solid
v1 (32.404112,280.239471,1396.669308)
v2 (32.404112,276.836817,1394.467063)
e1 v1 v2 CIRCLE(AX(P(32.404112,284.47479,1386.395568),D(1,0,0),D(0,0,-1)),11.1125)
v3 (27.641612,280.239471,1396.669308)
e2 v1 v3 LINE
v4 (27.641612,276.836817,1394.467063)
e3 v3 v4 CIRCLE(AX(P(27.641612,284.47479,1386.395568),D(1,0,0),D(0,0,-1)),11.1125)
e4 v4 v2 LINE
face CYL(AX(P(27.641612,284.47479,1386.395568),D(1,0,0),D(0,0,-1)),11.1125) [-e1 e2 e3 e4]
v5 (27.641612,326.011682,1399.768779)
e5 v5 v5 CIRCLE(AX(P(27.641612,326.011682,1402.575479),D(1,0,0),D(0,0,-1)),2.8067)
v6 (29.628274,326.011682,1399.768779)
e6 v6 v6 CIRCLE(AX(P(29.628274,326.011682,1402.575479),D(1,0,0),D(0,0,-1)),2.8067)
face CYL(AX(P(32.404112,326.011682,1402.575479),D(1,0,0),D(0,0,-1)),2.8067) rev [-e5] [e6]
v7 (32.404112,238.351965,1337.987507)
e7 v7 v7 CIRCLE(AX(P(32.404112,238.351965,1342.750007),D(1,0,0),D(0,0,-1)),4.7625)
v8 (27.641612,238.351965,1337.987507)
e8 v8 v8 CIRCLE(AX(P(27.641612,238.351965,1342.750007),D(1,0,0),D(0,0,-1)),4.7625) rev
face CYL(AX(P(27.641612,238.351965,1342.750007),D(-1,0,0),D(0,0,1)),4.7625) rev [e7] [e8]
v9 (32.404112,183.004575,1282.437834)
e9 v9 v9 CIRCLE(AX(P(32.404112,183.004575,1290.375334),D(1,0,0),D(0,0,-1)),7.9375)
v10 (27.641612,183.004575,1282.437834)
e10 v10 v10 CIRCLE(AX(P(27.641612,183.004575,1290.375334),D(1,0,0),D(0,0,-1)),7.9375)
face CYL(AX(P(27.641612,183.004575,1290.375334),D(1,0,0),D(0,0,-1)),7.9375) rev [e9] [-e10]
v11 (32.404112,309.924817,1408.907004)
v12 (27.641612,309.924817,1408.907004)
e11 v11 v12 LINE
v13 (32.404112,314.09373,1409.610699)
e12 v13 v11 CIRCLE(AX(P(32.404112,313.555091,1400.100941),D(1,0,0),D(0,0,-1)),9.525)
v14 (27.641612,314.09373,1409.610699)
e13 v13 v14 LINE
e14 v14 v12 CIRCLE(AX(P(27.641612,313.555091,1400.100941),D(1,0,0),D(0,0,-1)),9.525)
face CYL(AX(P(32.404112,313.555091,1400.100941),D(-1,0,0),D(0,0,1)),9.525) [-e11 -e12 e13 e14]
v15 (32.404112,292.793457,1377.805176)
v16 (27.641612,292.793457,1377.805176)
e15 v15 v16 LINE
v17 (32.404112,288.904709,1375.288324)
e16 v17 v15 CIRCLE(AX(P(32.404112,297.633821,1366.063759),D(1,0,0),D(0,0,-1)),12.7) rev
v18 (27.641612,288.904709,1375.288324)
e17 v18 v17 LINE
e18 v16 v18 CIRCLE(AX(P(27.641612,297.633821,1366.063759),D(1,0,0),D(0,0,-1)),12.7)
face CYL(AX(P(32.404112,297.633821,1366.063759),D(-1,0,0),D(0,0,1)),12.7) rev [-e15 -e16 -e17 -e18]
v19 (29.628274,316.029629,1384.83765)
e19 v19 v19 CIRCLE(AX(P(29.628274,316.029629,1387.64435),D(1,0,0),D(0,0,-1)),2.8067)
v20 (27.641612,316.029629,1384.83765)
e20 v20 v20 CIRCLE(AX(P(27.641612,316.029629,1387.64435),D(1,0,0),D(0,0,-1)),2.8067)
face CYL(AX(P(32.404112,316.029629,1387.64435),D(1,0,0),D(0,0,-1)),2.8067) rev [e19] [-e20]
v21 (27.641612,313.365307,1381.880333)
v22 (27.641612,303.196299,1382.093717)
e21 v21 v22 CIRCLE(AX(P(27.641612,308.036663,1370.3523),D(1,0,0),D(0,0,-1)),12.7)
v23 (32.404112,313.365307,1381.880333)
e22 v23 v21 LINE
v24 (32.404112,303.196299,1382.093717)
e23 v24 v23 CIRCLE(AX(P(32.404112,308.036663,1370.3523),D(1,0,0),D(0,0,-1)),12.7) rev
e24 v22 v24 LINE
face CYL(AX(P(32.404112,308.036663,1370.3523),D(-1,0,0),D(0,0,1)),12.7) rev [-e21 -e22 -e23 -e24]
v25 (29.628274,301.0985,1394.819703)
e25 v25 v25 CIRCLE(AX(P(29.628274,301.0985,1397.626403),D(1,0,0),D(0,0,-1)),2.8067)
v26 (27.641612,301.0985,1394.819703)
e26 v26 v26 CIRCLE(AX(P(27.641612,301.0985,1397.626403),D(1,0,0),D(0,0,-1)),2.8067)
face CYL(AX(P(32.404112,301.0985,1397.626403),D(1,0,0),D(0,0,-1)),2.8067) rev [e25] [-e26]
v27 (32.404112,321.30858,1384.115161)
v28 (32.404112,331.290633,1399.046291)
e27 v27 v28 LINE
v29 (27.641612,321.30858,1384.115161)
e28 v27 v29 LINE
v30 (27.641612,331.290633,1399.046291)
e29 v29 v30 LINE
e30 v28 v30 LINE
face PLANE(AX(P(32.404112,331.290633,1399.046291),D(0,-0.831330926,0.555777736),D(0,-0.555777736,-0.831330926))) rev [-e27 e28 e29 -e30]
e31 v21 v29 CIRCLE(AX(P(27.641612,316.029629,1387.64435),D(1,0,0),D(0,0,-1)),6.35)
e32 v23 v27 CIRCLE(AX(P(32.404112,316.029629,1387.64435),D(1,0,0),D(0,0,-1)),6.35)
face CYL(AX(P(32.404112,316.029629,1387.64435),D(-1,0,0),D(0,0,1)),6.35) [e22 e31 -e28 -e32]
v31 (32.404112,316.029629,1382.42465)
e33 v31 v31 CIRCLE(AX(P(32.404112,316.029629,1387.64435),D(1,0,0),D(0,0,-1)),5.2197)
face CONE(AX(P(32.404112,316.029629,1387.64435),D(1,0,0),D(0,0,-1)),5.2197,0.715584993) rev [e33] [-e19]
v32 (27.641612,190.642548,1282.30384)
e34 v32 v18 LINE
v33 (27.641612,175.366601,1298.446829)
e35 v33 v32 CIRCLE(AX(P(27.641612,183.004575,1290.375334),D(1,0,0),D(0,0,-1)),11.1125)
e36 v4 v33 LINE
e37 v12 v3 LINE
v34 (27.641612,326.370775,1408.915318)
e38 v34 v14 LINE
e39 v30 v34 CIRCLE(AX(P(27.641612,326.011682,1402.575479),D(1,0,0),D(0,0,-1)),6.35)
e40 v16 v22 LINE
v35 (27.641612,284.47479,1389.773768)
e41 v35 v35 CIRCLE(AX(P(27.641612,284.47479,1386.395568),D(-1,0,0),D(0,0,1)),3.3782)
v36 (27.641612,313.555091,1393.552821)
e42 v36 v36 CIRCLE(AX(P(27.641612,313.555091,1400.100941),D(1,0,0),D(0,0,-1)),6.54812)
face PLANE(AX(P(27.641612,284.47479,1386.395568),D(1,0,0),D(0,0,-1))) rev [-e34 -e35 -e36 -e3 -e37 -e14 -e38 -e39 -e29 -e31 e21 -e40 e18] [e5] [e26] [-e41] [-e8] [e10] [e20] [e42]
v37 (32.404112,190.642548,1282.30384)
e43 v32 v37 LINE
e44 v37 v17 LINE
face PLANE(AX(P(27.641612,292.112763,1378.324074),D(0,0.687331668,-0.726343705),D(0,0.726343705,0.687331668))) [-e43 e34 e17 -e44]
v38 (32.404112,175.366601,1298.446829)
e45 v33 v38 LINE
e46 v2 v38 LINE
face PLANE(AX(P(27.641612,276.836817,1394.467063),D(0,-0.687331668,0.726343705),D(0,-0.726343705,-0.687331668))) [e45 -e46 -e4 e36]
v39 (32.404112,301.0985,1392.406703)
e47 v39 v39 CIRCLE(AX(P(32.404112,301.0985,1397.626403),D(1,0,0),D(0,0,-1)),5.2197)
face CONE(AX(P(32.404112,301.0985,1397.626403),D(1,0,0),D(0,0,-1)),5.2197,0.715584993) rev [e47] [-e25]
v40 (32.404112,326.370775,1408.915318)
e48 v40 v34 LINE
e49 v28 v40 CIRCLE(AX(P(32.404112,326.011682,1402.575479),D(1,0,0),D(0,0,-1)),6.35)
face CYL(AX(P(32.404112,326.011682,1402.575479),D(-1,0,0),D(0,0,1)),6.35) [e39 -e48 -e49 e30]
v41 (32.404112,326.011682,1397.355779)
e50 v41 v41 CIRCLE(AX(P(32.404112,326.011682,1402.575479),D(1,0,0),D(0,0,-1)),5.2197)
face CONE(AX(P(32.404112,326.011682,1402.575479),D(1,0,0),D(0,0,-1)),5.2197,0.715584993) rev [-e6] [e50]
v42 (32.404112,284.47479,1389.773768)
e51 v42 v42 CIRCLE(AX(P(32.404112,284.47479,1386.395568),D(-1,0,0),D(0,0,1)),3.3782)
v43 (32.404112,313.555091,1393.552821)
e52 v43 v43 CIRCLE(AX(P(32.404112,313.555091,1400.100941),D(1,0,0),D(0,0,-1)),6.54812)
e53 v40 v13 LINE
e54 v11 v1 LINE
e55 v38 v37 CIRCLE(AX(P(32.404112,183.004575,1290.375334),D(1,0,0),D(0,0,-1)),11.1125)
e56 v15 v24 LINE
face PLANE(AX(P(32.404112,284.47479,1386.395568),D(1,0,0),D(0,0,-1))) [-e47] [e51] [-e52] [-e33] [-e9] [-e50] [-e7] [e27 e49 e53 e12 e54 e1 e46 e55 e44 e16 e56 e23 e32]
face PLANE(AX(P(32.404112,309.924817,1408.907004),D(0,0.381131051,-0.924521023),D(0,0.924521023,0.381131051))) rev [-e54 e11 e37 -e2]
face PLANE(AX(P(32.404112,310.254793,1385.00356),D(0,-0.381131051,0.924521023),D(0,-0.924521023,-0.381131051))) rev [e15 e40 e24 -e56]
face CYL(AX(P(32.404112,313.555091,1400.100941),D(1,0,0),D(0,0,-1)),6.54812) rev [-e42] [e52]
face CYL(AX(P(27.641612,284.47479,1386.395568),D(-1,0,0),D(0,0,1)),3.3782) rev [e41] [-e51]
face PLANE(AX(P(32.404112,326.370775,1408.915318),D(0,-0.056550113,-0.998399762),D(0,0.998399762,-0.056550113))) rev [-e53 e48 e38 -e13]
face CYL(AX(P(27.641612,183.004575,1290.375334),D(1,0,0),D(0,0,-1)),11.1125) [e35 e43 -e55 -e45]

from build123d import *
from OCP.BRepAlgoAPI import BRepAlgoAPI_Cut
from OCP.TopTools import TopTools_ListOfShape

# Parameters (mm, degrees)
BOSS_EXTRUDE1_START                         = 27.641612
SKETCH1_R                                   = 7.9375
BOSS_EXTRUDE1_DEPTH                         = 4.762501
F_1_4_CLEARANCE_HOLE1_D                     = 6.7564
CUT_EXTRUDE1_DEPTH                          = 1429.793432694
CUT_EXTRUDE1_DEPTH_BACK                     = 1429.793432694
SKETCH4_R                                   = 4.7625
BOSS_EXTRUDE2_START                         = 27.641612
BOSS_EXTRUDE2_DEPTH                         = 4.7625
F_1_2_CLEARANCE_HOLE1_D                     = 13.09624
CSK_FOR_10_FLAT_HEAD_SOCKET_CAP_SCR_2_COUNT = 2
CSK_FOR_10_FLAT_HEAD_SOCKET_CAP_SCR_2_PITCH = 17.960512242
CSK_FOR_10_FLAT_HEAD_SOCKET_CAP_SCR_3_COUNT = 2
CSK_FOR_10_FLAT_HEAD_SOCKET_CAP_SCR_3_PITCH = 25.4
FILLET1_R                                   = 12.7


with BuildPart() as part:
    # Sketch1 → Boss-Extrude1 (new body)
    with BuildSketch(Plane(origin=(0, 0, 0), x_dir=(0, 0, -1), z_dir=(1, 0, 0)).offset(BOSS_EXTRUDE1_START)):
        with BuildLine():
            Line((-1394.467062617, 276.836816997), (-1298.446828577, 175.366601392))
            ThreePointArc((-1298.446828577, 175.366601392), (-1282.737360992, 174.933080131), (-1282.303839731, 190.642547716))
            Line((-1282.303839731, 190.642547716), (-1378.32407377, 292.112763322))
            ThreePointArc((-1378.32407377, 292.112763322), (-1394.033541356, 292.546284583), (-1394.467062617, 276.836816997))
        make_face()
        with Locations((-1290.375334154, 183.004574554)):
            Circle(SKETCH1_R, mode=Mode.SUBTRACT)
    extrude(amount=BOSS_EXTRUDE1_DEPTH)

    # 1/4 Clearance Hole1 (through all)
    with Locations(Plane.ZY.offset(-27.641612484)):
        with Locations((1386.395568193, 284.47479016)):
            Hole(F_1_4_CLEARANCE_HOLE1_D / 2)

    # Sketch4 → Cut-Extrude1 (cut, two sides: drawn at the far end of the back side and taken through both)
    with BuildSketch(Plane(origin=(0, 0, 0), x_dir=(0, 0, -1), z_dir=(1, 0, 0)).offset(-CUT_EXTRUDE1_DEPTH_BACK)):
        with Locations((-1342.750007266, 238.351964884)):
            Circle(SKETCH4_R)
    extrude(amount=CUT_EXTRUDE1_DEPTH + CUT_EXTRUDE1_DEPTH_BACK, mode=Mode.SUBTRACT)

    # Sketch5 → Boss-Extrude2 (add)
    with BuildSketch(Plane(origin=(0, 0, 0), x_dir=(0, 0, -1), z_dir=(1, 0, 0)).offset(BOSS_EXTRUDE2_START)):
        with BuildLine():
            Line((-1408.915317884, 326.37077483), (-1409.610698903, 314.093730387))
            ThreePointArc((-1409.610698903, 314.093730387), (-1409.493080384, 311.969736982), (-1408.907003916, 309.924817308))
            Line((-1408.907003916, 309.924817308), (-1396.669308063, 280.239471359))
            ThreePointArc((-1396.669308063, 280.239471359), (-1392.433468222, 293.803853322), (-1378.32407377, 292.112763322))
            Line((-1378.32407377, 292.112763322), (-1376.907390708, 290.615671201))
            Line((-1376.907390708, 290.615671201), (-1385.003560397, 310.254792894))
            ThreePointArc((-1385.003560397, 310.254792894), (-1381.314759969, 315.520916186), (-1384.1151615, 321.308580171))
            Line((-1384.1151615, 321.308580171), (-1399.046290774, 331.290632995))
            ThreePointArc((-1399.046290774, 331.290632995), (-1405.408532388, 331.694665931), (-1408.915317884, 326.37077483))
        make_face()
    extrude(amount=BOSS_EXTRUDE2_DEPTH)

    # 1/2 Clearance Hole1 (through all)
    with Locations(Plane(origin=(32.404112484, 0, 0), x_dir=(0, 0, -1), z_dir=(1, 0, 0))):
        with Locations((-1400.10094117, 313.555090566)):
            Hole(F_1_2_CLEARANCE_HOLE1_D / 2)


with BuildPart() as csk_for_10_flat_head_socket_cap_screw1_tool:
    # Sketch10 → CSK for #10 Flat Head Socket Cap Screw1 (revolve)
    with BuildSketch(Plane(origin=(32.404112484, 326.011681615, 1402.575479395), x_dir=(0, 0, -1), z_dir=(0, 1, 0))):
        Polygon((0, 0), (0, 4.7625), (2.8067, 4.7625), (2.8067, 2.775838967), (5.2197, 0), align=None)
    csk_for_10_flat_head_socket_cap_screw1 = revolve(axis=Axis((38.754112484, 326.011681615, 1402.575479395), (-1, 0, 0)))


with BuildPart() as part_1:
    add(part.part)

    # CSK for #10 Flat Head Socket Cap Screw1: cut by csk_for_10_flat_head_socket_cap_screw1_tool, with a tolerance
    csk_for_10_flat_head_socket_cap_screw1_stock = TopTools_ListOfShape()
    csk_for_10_flat_head_socket_cap_screw1_stock.Append(part_1.part.wrapped)
    csk_for_10_flat_head_socket_cap_screw1_tools = TopTools_ListOfShape()
    csk_for_10_flat_head_socket_cap_screw1_tools.Append(csk_for_10_flat_head_socket_cap_screw1_tool.part.wrapped)
    csk_for_10_flat_head_socket_cap_screw1_cut = BRepAlgoAPI_Cut()
    csk_for_10_flat_head_socket_cap_screw1_cut.SetArguments(csk_for_10_flat_head_socket_cap_screw1_stock)
    csk_for_10_flat_head_socket_cap_screw1_cut.SetTools(csk_for_10_flat_head_socket_cap_screw1_tools)
    csk_for_10_flat_head_socket_cap_screw1_cut.SetFuzzyValue(0.00001)
    csk_for_10_flat_head_socket_cap_screw1_cut.Build()
    add(Compound.cast(csk_for_10_flat_head_socket_cap_screw1_cut.Shape()).solids(), mode=Mode.REPLACE)

    # CSK for _10 Flat Head Socket Cap Scr 2: CSK for #10 Flat Head Socket Cap Screw1 ×2
    with Locations(*[Vector(0, -0.5557777356316841, -0.8313309260313356) * (i * CSK_FOR_10_FLAT_HEAD_SOCKET_CAP_SCR_2_PITCH) for i in range(1, CSK_FOR_10_FLAT_HEAD_SOCKET_CAP_SCR_2_COUNT)]):
        add(csk_for_10_flat_head_socket_cap_screw1, mode=Mode.SUBTRACT)

    # CSK for _10 Flat Head Socket Cap Scr 3: CSK for #10 Flat Head Socket Cap Screw1 ×2
    with Locations(*[Vector(0, -0.9808339409045171, -0.19484552950918363) * (i * CSK_FOR_10_FLAT_HEAD_SOCKET_CAP_SCR_3_PITCH) for i in range(1, CSK_FOR_10_FLAT_HEAD_SOCKET_CAP_SCR_3_COUNT)]):
        add(csk_for_10_flat_head_socket_cap_screw1, mode=Mode.SUBTRACT)

    # Fillet1
    fillet1_edges = [part_1.edges().sort_by_distance(p)[0] for p in [
        (30.022862, 290.615671201, 1376.907390708),
        (30.022862, 310.254792894, 1385.003560397),
    ]]
    fillet(fillet1_edges, radius=FILLET1_R)


solid = part_1.part
